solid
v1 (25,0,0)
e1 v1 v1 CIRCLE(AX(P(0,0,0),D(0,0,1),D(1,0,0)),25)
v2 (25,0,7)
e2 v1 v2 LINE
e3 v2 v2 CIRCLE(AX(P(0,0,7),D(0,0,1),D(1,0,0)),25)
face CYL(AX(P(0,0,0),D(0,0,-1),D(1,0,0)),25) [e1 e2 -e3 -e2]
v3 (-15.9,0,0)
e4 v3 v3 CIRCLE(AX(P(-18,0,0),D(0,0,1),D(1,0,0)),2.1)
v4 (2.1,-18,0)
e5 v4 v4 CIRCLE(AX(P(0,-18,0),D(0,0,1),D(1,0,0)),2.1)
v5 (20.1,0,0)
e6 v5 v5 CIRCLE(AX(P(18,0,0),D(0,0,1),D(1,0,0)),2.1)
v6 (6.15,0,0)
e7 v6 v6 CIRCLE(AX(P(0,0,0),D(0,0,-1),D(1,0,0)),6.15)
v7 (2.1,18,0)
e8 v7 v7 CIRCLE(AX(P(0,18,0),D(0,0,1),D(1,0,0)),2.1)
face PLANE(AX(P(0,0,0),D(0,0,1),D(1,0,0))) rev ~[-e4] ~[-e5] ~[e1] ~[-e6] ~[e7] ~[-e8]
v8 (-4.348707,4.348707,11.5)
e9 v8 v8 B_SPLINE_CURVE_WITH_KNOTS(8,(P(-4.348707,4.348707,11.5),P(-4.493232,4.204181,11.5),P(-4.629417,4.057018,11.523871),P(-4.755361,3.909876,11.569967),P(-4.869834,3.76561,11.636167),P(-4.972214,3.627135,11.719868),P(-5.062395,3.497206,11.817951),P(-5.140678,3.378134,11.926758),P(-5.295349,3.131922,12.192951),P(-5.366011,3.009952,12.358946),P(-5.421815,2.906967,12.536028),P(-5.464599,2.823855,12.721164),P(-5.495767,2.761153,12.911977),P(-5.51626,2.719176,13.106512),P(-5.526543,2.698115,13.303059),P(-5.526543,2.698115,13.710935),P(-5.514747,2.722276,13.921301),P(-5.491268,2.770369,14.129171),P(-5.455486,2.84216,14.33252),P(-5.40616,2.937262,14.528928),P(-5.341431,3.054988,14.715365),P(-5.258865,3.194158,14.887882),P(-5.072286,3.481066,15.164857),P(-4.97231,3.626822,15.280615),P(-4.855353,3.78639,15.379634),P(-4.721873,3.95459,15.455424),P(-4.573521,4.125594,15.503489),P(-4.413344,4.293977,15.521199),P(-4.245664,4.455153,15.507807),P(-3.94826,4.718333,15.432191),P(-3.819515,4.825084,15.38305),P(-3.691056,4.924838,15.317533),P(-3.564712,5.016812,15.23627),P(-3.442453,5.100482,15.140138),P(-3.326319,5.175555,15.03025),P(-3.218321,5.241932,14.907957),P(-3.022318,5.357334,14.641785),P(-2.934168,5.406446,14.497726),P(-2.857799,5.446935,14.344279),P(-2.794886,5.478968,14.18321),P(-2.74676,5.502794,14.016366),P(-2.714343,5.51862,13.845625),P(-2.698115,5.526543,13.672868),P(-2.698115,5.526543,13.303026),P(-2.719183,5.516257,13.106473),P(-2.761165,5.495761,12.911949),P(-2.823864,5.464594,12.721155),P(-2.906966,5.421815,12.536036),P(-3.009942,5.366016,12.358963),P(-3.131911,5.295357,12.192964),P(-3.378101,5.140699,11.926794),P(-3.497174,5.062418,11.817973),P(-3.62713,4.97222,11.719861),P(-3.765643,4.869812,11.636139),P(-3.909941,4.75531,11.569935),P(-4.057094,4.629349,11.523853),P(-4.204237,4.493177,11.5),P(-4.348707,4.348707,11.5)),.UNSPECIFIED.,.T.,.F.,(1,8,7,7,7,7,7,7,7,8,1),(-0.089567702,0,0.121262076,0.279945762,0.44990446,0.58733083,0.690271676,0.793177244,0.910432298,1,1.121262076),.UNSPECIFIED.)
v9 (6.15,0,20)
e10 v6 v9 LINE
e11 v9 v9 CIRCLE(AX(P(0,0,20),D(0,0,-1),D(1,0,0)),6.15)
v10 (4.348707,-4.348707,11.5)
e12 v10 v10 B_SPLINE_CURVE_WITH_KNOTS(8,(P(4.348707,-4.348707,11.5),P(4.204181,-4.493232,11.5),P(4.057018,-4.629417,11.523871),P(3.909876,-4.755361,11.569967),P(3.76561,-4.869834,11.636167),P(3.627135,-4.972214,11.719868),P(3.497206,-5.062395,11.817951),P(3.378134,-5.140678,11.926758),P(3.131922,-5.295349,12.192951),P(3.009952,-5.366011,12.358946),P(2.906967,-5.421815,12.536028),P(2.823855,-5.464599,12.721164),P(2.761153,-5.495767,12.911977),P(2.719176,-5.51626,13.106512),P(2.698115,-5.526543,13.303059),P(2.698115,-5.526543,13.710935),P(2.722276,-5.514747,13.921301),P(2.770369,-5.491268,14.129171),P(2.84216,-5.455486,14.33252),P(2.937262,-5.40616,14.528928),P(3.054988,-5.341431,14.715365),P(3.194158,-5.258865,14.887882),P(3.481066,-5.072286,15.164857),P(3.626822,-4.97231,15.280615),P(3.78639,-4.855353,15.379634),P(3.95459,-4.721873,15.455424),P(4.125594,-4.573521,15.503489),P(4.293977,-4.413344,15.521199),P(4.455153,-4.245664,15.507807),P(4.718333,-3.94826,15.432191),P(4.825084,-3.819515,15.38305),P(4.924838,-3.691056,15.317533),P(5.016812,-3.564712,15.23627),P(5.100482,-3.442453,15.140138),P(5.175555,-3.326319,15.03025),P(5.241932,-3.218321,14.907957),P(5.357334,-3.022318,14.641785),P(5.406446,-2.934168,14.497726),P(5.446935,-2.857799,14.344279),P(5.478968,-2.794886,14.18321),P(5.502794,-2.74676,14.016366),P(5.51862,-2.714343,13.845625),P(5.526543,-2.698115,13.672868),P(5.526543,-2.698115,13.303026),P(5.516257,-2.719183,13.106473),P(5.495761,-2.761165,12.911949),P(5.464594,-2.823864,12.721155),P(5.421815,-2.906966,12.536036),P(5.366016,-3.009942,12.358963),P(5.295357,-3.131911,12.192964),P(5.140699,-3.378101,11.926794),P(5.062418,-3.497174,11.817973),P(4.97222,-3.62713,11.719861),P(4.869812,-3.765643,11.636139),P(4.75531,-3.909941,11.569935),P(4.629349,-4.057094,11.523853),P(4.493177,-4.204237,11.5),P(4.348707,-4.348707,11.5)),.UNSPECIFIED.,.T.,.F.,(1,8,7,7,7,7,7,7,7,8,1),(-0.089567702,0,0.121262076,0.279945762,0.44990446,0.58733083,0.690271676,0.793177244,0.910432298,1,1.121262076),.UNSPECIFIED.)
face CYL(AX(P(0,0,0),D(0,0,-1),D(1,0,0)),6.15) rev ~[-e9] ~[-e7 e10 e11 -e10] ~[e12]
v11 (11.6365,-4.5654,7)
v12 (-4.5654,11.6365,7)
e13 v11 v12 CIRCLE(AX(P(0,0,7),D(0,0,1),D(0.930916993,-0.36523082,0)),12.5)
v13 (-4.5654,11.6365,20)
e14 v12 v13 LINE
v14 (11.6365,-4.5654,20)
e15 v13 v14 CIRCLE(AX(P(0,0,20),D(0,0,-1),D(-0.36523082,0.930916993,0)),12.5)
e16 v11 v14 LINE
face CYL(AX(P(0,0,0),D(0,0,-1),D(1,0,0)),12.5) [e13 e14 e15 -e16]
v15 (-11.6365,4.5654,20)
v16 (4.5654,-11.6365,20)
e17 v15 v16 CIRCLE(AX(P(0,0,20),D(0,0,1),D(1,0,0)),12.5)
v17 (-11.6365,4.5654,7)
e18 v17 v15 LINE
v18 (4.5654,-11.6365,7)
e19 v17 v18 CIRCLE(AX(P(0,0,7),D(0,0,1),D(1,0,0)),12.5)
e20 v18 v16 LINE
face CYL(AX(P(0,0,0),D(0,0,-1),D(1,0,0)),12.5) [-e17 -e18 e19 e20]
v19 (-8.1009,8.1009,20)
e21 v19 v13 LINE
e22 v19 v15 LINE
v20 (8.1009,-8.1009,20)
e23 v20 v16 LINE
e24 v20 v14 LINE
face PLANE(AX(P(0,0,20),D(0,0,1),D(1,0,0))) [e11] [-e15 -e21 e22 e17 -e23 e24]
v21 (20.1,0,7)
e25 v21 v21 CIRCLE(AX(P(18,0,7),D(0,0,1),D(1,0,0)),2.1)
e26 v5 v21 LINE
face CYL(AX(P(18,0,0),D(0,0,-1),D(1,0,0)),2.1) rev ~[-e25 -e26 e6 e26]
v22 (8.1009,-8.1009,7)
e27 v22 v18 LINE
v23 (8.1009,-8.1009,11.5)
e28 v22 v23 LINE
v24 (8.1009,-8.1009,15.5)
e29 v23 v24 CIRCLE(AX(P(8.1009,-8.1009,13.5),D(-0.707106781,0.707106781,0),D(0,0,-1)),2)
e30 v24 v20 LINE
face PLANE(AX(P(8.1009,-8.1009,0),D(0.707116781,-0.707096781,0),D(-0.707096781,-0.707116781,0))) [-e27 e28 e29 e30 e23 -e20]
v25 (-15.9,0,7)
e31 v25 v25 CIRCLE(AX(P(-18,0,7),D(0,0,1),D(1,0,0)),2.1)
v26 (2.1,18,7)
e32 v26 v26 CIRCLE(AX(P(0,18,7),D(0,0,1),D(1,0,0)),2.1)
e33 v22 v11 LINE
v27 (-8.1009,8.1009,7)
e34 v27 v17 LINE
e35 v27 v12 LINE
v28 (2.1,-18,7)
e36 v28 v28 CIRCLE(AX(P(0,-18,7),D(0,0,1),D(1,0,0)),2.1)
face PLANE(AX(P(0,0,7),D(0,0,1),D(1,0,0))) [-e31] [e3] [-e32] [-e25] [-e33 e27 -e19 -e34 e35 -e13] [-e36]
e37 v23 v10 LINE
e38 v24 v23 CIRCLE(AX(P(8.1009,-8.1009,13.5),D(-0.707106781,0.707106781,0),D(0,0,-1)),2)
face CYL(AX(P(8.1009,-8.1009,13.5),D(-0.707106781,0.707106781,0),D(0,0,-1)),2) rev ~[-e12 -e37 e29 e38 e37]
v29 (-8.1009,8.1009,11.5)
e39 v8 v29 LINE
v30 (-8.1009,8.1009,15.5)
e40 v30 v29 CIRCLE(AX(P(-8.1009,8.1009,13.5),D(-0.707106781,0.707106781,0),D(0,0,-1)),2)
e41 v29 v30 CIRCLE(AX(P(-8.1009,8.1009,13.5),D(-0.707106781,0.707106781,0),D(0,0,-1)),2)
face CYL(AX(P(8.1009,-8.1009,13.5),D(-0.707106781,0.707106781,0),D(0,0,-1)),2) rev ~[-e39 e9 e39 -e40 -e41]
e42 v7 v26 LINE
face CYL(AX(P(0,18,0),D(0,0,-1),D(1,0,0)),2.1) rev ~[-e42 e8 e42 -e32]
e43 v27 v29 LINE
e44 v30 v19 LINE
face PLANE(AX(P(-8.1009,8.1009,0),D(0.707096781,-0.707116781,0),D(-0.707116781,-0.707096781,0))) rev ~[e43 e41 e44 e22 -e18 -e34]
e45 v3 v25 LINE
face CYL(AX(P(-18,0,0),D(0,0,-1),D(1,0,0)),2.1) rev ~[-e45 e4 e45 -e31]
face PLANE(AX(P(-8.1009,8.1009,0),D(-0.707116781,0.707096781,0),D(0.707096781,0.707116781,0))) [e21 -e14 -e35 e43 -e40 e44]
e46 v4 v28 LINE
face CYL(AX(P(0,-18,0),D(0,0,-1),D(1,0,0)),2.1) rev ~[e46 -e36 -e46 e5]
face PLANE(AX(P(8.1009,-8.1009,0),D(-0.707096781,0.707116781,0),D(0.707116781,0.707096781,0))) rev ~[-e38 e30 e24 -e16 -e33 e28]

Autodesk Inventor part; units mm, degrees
ref_plane "YZ Plane" through (0, 0, 0) normal (1, 0, 0) x (0, 1, 0)
ref_plane "XZ Plane" through (0, 0, 0) normal (0, 1, 0) x (-1, 0, 0)
ref_plane "XY Plane" through (0, 0, 0) normal (0, 0, 1) x (1, 0, 0)
sketch "スケッチ1" plane through (0, 0, 0) normal (0, 0, 1) x (1, 0, 0)
  circle A0 centre (0, 0) radius 25
  circle A1 centre (0, 0) radius 6.15
  circle A2 centre (0, 0) radius 12.5
  line L0 (0, 0) -> (-8.8388, 8.8388)
  line L1 (0, 0) -> (12.5, 0) construction
  line L2 (-8.1009, 8.1009) -> (-4.5654, 11.6365)
  line L3 (-8.1009, 8.1009) -> (-11.6365, 4.5654)
  line L4 (8.1009, -8.1009) -> (4.5654, -11.6365)
  line L5 (8.1009, -8.1009) -> (11.6365, -4.5654)
  circle A3 centre (0, 18) radius 2.1
  circle A4 centre (-18, 0) radius 2.1
  circle A5 centre (0, -18) radius 2.1
  circle A6 centre (18, 0) radius 2.1
  dimension "d0" = 50
  dimension "d1" = 12.3
  dimension "d2" = 25
  dimension "d3" = 135
  dimension "d4" = 5
  dimension "d7" = 360
  dimension "d9" = 18
  dimension "d12" = 360
  dimension "d14" = 4.2
  dimension "d17" = 360
extrude "押し出し1" add sketch "スケッチ1" along normal blind 7 contours A0 | L2 L0 A2 | A2 L4 L5 | L0 L3 A2
extrude "押し出し2" add sketch "スケッチ1" along normal blind 20 contours A2 L5 L4 L3 L2
sketch "スケッチ2" plane through (11.6365, -4.5654, 20) normal (0.7071068, -0.7071068, 0) x (-0.7071068, -0.7071068, 0)
  line L0 (10, 0) -> (0, 0) projected
  point P0 (5, 20)
  point P1 (5, 6.5)
  dimension "d23" = 6.5
hole "穴1" at (8.1009, -8.1009, 13.5) direction (-0.7071068, 0.7071068, 0) diameter 4 end through all
properties part number "TH22_3D_tire_v3" material "ABS プラスチック"
